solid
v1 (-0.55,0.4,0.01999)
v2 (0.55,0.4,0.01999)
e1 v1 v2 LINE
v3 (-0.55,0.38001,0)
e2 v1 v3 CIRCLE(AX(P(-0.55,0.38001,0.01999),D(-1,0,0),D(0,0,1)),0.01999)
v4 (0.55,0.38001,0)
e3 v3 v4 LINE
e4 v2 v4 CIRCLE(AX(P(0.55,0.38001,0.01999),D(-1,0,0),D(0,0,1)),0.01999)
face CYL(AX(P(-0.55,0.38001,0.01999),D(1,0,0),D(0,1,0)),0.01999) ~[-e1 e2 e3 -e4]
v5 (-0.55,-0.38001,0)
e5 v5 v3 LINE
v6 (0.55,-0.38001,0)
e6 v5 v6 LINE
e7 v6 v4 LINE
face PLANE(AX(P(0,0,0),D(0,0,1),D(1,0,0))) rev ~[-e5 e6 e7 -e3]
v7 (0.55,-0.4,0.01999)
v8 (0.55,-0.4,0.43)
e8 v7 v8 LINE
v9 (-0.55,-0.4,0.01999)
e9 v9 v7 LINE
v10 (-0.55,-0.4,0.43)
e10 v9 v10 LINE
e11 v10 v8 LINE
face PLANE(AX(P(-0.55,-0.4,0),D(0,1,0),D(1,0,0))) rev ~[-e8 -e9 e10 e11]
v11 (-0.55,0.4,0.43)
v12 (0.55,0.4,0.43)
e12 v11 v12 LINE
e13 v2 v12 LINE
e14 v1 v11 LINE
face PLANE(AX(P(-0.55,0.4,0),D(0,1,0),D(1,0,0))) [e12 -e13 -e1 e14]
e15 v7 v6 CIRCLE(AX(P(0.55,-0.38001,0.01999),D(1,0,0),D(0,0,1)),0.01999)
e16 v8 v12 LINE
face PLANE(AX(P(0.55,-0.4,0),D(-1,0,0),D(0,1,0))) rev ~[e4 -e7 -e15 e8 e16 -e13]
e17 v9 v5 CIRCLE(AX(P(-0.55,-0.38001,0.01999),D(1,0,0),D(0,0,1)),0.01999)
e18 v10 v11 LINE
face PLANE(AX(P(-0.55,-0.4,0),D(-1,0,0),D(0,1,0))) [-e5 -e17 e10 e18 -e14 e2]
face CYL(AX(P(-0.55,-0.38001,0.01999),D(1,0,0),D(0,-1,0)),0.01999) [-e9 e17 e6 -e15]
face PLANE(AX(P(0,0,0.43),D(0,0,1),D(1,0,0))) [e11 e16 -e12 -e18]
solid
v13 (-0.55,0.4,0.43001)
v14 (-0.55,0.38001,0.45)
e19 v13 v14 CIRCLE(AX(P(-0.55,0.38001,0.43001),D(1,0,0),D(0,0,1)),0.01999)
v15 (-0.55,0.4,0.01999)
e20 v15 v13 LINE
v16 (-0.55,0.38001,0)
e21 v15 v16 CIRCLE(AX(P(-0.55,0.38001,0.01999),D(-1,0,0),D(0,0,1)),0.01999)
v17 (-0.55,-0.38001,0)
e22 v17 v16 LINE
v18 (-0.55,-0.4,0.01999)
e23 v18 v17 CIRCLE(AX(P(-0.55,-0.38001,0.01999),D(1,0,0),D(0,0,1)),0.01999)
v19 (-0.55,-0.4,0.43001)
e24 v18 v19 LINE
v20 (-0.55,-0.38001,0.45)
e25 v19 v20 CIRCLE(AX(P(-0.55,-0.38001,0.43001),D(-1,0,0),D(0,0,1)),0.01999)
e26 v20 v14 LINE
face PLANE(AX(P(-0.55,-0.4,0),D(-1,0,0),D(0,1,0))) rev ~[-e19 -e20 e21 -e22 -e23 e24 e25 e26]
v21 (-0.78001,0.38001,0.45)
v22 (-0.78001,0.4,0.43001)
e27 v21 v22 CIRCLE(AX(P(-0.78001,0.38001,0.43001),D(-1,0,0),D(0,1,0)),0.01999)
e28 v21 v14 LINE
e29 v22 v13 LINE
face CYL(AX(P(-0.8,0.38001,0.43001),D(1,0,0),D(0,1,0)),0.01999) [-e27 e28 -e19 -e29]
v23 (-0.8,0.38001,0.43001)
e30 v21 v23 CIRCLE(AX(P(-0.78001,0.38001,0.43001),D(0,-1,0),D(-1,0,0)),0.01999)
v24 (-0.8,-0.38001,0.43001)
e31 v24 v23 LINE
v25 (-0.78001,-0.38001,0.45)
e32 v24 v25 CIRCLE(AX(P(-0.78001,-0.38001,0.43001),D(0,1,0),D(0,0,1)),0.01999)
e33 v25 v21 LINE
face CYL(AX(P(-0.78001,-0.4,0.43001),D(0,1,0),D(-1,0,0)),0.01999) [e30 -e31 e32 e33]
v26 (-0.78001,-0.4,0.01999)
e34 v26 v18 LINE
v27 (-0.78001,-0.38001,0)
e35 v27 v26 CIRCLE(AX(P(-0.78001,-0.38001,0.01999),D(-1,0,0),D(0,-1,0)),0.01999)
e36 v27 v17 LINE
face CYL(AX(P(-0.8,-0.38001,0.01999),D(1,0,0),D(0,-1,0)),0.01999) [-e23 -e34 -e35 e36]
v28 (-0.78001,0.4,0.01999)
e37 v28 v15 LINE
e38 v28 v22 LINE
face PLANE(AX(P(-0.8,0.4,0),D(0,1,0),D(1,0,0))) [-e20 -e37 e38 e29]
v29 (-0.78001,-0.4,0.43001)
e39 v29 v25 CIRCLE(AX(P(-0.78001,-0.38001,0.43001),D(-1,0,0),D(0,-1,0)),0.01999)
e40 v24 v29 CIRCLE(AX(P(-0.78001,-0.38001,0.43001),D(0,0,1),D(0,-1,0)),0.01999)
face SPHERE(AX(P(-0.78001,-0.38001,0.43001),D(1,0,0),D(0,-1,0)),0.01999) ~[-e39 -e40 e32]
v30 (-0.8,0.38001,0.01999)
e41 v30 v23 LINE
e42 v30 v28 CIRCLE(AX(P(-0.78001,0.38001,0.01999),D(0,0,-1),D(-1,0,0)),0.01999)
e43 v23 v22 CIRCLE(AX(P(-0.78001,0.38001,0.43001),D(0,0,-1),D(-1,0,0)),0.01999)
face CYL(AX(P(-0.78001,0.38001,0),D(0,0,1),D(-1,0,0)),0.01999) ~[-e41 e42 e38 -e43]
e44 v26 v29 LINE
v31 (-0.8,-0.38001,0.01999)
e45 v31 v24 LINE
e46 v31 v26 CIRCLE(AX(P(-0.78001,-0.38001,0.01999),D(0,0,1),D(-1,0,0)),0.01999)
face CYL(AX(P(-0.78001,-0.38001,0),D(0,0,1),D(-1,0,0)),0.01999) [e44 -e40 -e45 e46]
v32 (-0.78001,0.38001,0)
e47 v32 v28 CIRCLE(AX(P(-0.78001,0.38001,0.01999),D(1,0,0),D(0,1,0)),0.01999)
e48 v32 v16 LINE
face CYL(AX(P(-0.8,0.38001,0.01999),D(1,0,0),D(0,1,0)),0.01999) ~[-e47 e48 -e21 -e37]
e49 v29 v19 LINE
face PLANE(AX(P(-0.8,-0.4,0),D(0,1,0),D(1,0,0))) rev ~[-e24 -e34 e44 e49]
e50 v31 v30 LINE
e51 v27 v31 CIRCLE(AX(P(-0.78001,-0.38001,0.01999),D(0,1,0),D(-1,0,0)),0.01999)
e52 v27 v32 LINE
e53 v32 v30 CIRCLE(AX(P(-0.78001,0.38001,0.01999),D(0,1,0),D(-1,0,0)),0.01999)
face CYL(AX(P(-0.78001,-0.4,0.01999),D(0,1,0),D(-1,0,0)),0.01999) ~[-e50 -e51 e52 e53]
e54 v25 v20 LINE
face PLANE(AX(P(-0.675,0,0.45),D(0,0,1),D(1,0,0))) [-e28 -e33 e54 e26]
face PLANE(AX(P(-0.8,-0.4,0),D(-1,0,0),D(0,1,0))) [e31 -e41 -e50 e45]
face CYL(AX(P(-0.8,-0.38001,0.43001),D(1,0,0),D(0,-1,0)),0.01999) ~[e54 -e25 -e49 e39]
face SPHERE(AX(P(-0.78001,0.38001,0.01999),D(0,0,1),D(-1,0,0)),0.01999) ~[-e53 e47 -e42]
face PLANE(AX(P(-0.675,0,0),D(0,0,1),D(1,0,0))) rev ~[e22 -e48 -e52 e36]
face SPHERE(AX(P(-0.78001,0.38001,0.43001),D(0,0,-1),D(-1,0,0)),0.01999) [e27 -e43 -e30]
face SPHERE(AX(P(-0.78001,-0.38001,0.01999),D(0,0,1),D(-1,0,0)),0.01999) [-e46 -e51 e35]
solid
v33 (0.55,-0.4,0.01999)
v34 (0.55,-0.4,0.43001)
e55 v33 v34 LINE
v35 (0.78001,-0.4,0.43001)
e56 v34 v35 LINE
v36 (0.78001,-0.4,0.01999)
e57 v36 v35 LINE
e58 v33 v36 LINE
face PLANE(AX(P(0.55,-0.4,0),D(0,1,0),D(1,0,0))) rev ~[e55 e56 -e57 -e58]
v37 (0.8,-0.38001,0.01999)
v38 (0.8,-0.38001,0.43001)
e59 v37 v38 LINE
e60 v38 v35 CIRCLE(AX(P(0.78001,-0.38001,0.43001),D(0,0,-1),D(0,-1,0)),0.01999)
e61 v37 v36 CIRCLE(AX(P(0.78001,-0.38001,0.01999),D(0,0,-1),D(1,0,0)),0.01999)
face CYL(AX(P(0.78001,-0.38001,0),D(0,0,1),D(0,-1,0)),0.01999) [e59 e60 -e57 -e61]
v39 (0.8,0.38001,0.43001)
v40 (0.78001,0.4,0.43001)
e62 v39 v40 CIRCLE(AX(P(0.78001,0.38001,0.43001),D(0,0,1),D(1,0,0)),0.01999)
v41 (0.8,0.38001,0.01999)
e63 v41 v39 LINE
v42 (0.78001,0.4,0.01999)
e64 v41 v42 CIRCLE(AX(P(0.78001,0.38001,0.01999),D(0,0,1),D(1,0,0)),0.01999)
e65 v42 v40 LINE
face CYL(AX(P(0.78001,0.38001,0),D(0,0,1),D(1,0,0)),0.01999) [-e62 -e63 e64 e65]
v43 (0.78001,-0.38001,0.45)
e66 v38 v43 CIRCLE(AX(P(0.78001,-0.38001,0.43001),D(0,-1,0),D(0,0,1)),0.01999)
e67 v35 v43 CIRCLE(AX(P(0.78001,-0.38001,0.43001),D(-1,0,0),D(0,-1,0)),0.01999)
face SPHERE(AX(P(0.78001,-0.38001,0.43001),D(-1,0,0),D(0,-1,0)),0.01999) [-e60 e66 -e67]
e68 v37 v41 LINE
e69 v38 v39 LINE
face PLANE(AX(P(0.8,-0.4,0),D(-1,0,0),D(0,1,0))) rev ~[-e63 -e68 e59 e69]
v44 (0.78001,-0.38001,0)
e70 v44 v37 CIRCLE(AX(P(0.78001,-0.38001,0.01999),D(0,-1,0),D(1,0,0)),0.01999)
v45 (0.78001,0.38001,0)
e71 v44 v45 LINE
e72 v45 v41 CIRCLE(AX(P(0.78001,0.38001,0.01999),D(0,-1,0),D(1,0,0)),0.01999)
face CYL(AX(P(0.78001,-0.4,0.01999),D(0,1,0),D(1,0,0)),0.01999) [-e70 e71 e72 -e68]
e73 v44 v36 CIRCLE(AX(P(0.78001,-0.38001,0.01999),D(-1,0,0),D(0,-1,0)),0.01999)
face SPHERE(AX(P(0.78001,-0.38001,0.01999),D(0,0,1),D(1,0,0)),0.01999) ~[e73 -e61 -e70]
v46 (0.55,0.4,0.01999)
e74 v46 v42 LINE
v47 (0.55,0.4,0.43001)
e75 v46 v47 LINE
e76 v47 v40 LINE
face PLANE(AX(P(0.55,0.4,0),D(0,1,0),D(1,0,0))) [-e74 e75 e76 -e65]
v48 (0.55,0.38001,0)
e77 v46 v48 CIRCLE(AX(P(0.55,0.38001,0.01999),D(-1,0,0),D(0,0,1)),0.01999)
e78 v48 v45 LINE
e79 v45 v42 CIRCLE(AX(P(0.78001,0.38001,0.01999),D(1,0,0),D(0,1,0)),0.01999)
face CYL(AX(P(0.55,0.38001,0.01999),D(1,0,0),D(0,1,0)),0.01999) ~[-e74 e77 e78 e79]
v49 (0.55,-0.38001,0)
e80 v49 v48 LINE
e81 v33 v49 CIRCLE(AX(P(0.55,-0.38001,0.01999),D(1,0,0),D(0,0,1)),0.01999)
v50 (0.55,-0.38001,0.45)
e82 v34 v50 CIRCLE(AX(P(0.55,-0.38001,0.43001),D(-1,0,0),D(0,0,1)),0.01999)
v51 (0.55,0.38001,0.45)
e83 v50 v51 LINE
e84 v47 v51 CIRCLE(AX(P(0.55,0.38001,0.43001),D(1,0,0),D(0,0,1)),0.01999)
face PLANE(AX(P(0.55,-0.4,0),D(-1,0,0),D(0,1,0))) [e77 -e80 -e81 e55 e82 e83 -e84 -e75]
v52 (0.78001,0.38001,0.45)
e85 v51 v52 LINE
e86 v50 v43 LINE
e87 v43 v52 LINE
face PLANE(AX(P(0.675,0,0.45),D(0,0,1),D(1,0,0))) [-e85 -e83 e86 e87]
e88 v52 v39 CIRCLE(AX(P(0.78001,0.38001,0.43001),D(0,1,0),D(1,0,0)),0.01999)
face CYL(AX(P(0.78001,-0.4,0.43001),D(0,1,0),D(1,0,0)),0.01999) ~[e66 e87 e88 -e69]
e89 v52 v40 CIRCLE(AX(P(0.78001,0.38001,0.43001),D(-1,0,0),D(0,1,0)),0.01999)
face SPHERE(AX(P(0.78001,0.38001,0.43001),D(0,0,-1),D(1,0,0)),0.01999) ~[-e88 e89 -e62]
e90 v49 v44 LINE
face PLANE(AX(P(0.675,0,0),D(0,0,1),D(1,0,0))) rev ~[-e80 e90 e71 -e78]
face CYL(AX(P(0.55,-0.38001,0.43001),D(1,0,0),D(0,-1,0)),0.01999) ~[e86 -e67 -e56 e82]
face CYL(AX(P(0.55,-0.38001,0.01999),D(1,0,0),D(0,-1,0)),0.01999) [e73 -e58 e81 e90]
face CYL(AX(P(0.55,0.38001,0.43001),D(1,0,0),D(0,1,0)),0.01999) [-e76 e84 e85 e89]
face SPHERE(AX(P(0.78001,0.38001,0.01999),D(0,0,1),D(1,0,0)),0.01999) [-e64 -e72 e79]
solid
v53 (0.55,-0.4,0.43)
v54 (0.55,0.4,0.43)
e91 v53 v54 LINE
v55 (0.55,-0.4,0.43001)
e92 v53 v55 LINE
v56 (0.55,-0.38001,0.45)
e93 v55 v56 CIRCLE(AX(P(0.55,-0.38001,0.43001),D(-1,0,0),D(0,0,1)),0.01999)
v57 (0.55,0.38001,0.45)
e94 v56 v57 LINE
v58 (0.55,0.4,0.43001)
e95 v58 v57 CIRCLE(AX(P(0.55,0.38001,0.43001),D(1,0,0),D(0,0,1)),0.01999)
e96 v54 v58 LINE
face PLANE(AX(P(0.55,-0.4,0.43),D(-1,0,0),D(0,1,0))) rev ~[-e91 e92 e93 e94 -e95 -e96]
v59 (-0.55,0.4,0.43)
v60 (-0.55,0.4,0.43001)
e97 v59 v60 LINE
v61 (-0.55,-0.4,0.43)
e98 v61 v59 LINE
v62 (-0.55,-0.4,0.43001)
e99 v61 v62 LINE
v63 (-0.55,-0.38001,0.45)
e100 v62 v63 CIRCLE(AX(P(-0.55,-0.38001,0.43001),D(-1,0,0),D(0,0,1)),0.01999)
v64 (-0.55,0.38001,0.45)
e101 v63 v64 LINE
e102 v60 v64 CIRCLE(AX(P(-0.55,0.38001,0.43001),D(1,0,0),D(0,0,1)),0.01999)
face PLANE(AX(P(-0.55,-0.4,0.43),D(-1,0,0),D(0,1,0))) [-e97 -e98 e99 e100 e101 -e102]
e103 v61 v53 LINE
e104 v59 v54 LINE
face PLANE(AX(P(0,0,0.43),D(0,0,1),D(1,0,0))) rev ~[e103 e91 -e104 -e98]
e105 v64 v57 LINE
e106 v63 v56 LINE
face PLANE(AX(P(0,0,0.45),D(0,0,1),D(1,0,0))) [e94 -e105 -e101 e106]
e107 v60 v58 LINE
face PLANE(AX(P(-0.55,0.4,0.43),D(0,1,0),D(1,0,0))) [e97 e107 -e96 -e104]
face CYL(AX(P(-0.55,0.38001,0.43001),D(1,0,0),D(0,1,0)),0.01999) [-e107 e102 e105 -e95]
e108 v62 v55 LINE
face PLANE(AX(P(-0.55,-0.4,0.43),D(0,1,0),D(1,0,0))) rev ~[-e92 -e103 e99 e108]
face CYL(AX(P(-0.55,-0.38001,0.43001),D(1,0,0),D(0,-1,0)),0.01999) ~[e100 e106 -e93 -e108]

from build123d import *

# Parameters (mm, degrees)
F2_W     = 1.1
F2_H     = 0.8
F3_DEPTH = 0.43
F2_W_2   = 0.25
F4_DEPTH = 0.45
F5_DEPTH = 0.45
F6_DEPTH = 0.02
F7_R     = 0.01999
F7_2_R   = 0.01999
F7_3_R   = 0.01999
F7_4_R   = 0.01999


# Not quite as in the source:
# - a fillet or chamfer is up to 0.001 mm smaller than in the source, because OpenCascade refuses the exact size


with BuildPart() as f3:
    # F2 (on Top) → F3 (new body)
    with BuildSketch(Plane.XY):
        Rectangle(F2_W, F2_H)
    extrude(amount=F3_DEPTH)


with BuildPart() as f4:
    # F2 (on Top) → F4 (new body)
    with BuildSketch(Plane.XY):
        with Locations((-0.675, 0)):
            Rectangle(F2_W_2, F2_H)
    extrude(amount=F4_DEPTH)

    # F7 (radius 0.02 in the source; OpenCascade refuses exactly that, so slightly less here)
    f7_edges = [f4.edges().sort_by_distance(p)[0] for p in [
        (-0.675, -0.4, 0.45),
        (-0.8, 0.4, 0.225),
        (-0.8, -0.4, 0.225),
        (-0.8, 0, 0),
        (-0.8, 0, 0.45),
        (-0.675, 0.4, 0.45),
        (-0.675, 0.4, 0),
        (-0.675, -0.4, 0),
    ]]
    fillet(f7_edges, radius=F7_R)


with BuildPart() as f5:
    # F2 (on Top) → F5 (new body)
    with BuildSketch(Plane.XY):
        with Locations((0.675, 0)):
            Rectangle(F2_W_2, F2_H)
    extrude(amount=F5_DEPTH)

    # F7#2 (radius 0.02 in the source; OpenCascade refuses exactly that, so slightly less here)
    f7_2_edges = [f5.edges().sort_by_distance(p)[0] for p in [
        (0.675, -0.4, 0.45),
        (0.8, -0.4, 0.225),
        (0.8, 0.4, 0.225),
        (0.8, 0, 0),
        (0.8, 0, 0.45),
        (0.675, 0.4, 0.45),
        (0.675, 0.4, 0),
        (0.675, -0.4, 0),
    ]]
    fillet(f7_2_edges, radius=F7_2_R)


with BuildPart() as f6:
    # F6 (new): a face of the model
    f6_faces = [f3.part.faces().sort_by_distance(p)[0] for p in [
        (0, 0, 0.43),
    ]]
    extrude(f6_faces, amount=F6_DEPTH)

    # F7#4 (radius 0.02 in the source; OpenCascade refuses exactly that, so slightly less here)
    f7_4_edges = [f6.edges().sort_by_distance(p)[0] for p in [
        (0, -0.4, 0.45),
        (0, 0.4, 0.45),
    ]]
    fillet(f7_4_edges, radius=F7_4_R)


with BuildPart() as f3_1:
    add(f3.part)

    # F7#3 (radius 0.02 in the source; OpenCascade refuses exactly that, so slightly less here)
    f7_3_edges = [f3_1.edges().sort_by_distance(p)[0] for p in [
        (0, 0.4, 0),
        (0, -0.4, 0),
    ]]
    fillet(f7_3_edges, radius=F7_3_R)


solid = Compound([f4.part, f5.part, f6.part, f3_1.part])
